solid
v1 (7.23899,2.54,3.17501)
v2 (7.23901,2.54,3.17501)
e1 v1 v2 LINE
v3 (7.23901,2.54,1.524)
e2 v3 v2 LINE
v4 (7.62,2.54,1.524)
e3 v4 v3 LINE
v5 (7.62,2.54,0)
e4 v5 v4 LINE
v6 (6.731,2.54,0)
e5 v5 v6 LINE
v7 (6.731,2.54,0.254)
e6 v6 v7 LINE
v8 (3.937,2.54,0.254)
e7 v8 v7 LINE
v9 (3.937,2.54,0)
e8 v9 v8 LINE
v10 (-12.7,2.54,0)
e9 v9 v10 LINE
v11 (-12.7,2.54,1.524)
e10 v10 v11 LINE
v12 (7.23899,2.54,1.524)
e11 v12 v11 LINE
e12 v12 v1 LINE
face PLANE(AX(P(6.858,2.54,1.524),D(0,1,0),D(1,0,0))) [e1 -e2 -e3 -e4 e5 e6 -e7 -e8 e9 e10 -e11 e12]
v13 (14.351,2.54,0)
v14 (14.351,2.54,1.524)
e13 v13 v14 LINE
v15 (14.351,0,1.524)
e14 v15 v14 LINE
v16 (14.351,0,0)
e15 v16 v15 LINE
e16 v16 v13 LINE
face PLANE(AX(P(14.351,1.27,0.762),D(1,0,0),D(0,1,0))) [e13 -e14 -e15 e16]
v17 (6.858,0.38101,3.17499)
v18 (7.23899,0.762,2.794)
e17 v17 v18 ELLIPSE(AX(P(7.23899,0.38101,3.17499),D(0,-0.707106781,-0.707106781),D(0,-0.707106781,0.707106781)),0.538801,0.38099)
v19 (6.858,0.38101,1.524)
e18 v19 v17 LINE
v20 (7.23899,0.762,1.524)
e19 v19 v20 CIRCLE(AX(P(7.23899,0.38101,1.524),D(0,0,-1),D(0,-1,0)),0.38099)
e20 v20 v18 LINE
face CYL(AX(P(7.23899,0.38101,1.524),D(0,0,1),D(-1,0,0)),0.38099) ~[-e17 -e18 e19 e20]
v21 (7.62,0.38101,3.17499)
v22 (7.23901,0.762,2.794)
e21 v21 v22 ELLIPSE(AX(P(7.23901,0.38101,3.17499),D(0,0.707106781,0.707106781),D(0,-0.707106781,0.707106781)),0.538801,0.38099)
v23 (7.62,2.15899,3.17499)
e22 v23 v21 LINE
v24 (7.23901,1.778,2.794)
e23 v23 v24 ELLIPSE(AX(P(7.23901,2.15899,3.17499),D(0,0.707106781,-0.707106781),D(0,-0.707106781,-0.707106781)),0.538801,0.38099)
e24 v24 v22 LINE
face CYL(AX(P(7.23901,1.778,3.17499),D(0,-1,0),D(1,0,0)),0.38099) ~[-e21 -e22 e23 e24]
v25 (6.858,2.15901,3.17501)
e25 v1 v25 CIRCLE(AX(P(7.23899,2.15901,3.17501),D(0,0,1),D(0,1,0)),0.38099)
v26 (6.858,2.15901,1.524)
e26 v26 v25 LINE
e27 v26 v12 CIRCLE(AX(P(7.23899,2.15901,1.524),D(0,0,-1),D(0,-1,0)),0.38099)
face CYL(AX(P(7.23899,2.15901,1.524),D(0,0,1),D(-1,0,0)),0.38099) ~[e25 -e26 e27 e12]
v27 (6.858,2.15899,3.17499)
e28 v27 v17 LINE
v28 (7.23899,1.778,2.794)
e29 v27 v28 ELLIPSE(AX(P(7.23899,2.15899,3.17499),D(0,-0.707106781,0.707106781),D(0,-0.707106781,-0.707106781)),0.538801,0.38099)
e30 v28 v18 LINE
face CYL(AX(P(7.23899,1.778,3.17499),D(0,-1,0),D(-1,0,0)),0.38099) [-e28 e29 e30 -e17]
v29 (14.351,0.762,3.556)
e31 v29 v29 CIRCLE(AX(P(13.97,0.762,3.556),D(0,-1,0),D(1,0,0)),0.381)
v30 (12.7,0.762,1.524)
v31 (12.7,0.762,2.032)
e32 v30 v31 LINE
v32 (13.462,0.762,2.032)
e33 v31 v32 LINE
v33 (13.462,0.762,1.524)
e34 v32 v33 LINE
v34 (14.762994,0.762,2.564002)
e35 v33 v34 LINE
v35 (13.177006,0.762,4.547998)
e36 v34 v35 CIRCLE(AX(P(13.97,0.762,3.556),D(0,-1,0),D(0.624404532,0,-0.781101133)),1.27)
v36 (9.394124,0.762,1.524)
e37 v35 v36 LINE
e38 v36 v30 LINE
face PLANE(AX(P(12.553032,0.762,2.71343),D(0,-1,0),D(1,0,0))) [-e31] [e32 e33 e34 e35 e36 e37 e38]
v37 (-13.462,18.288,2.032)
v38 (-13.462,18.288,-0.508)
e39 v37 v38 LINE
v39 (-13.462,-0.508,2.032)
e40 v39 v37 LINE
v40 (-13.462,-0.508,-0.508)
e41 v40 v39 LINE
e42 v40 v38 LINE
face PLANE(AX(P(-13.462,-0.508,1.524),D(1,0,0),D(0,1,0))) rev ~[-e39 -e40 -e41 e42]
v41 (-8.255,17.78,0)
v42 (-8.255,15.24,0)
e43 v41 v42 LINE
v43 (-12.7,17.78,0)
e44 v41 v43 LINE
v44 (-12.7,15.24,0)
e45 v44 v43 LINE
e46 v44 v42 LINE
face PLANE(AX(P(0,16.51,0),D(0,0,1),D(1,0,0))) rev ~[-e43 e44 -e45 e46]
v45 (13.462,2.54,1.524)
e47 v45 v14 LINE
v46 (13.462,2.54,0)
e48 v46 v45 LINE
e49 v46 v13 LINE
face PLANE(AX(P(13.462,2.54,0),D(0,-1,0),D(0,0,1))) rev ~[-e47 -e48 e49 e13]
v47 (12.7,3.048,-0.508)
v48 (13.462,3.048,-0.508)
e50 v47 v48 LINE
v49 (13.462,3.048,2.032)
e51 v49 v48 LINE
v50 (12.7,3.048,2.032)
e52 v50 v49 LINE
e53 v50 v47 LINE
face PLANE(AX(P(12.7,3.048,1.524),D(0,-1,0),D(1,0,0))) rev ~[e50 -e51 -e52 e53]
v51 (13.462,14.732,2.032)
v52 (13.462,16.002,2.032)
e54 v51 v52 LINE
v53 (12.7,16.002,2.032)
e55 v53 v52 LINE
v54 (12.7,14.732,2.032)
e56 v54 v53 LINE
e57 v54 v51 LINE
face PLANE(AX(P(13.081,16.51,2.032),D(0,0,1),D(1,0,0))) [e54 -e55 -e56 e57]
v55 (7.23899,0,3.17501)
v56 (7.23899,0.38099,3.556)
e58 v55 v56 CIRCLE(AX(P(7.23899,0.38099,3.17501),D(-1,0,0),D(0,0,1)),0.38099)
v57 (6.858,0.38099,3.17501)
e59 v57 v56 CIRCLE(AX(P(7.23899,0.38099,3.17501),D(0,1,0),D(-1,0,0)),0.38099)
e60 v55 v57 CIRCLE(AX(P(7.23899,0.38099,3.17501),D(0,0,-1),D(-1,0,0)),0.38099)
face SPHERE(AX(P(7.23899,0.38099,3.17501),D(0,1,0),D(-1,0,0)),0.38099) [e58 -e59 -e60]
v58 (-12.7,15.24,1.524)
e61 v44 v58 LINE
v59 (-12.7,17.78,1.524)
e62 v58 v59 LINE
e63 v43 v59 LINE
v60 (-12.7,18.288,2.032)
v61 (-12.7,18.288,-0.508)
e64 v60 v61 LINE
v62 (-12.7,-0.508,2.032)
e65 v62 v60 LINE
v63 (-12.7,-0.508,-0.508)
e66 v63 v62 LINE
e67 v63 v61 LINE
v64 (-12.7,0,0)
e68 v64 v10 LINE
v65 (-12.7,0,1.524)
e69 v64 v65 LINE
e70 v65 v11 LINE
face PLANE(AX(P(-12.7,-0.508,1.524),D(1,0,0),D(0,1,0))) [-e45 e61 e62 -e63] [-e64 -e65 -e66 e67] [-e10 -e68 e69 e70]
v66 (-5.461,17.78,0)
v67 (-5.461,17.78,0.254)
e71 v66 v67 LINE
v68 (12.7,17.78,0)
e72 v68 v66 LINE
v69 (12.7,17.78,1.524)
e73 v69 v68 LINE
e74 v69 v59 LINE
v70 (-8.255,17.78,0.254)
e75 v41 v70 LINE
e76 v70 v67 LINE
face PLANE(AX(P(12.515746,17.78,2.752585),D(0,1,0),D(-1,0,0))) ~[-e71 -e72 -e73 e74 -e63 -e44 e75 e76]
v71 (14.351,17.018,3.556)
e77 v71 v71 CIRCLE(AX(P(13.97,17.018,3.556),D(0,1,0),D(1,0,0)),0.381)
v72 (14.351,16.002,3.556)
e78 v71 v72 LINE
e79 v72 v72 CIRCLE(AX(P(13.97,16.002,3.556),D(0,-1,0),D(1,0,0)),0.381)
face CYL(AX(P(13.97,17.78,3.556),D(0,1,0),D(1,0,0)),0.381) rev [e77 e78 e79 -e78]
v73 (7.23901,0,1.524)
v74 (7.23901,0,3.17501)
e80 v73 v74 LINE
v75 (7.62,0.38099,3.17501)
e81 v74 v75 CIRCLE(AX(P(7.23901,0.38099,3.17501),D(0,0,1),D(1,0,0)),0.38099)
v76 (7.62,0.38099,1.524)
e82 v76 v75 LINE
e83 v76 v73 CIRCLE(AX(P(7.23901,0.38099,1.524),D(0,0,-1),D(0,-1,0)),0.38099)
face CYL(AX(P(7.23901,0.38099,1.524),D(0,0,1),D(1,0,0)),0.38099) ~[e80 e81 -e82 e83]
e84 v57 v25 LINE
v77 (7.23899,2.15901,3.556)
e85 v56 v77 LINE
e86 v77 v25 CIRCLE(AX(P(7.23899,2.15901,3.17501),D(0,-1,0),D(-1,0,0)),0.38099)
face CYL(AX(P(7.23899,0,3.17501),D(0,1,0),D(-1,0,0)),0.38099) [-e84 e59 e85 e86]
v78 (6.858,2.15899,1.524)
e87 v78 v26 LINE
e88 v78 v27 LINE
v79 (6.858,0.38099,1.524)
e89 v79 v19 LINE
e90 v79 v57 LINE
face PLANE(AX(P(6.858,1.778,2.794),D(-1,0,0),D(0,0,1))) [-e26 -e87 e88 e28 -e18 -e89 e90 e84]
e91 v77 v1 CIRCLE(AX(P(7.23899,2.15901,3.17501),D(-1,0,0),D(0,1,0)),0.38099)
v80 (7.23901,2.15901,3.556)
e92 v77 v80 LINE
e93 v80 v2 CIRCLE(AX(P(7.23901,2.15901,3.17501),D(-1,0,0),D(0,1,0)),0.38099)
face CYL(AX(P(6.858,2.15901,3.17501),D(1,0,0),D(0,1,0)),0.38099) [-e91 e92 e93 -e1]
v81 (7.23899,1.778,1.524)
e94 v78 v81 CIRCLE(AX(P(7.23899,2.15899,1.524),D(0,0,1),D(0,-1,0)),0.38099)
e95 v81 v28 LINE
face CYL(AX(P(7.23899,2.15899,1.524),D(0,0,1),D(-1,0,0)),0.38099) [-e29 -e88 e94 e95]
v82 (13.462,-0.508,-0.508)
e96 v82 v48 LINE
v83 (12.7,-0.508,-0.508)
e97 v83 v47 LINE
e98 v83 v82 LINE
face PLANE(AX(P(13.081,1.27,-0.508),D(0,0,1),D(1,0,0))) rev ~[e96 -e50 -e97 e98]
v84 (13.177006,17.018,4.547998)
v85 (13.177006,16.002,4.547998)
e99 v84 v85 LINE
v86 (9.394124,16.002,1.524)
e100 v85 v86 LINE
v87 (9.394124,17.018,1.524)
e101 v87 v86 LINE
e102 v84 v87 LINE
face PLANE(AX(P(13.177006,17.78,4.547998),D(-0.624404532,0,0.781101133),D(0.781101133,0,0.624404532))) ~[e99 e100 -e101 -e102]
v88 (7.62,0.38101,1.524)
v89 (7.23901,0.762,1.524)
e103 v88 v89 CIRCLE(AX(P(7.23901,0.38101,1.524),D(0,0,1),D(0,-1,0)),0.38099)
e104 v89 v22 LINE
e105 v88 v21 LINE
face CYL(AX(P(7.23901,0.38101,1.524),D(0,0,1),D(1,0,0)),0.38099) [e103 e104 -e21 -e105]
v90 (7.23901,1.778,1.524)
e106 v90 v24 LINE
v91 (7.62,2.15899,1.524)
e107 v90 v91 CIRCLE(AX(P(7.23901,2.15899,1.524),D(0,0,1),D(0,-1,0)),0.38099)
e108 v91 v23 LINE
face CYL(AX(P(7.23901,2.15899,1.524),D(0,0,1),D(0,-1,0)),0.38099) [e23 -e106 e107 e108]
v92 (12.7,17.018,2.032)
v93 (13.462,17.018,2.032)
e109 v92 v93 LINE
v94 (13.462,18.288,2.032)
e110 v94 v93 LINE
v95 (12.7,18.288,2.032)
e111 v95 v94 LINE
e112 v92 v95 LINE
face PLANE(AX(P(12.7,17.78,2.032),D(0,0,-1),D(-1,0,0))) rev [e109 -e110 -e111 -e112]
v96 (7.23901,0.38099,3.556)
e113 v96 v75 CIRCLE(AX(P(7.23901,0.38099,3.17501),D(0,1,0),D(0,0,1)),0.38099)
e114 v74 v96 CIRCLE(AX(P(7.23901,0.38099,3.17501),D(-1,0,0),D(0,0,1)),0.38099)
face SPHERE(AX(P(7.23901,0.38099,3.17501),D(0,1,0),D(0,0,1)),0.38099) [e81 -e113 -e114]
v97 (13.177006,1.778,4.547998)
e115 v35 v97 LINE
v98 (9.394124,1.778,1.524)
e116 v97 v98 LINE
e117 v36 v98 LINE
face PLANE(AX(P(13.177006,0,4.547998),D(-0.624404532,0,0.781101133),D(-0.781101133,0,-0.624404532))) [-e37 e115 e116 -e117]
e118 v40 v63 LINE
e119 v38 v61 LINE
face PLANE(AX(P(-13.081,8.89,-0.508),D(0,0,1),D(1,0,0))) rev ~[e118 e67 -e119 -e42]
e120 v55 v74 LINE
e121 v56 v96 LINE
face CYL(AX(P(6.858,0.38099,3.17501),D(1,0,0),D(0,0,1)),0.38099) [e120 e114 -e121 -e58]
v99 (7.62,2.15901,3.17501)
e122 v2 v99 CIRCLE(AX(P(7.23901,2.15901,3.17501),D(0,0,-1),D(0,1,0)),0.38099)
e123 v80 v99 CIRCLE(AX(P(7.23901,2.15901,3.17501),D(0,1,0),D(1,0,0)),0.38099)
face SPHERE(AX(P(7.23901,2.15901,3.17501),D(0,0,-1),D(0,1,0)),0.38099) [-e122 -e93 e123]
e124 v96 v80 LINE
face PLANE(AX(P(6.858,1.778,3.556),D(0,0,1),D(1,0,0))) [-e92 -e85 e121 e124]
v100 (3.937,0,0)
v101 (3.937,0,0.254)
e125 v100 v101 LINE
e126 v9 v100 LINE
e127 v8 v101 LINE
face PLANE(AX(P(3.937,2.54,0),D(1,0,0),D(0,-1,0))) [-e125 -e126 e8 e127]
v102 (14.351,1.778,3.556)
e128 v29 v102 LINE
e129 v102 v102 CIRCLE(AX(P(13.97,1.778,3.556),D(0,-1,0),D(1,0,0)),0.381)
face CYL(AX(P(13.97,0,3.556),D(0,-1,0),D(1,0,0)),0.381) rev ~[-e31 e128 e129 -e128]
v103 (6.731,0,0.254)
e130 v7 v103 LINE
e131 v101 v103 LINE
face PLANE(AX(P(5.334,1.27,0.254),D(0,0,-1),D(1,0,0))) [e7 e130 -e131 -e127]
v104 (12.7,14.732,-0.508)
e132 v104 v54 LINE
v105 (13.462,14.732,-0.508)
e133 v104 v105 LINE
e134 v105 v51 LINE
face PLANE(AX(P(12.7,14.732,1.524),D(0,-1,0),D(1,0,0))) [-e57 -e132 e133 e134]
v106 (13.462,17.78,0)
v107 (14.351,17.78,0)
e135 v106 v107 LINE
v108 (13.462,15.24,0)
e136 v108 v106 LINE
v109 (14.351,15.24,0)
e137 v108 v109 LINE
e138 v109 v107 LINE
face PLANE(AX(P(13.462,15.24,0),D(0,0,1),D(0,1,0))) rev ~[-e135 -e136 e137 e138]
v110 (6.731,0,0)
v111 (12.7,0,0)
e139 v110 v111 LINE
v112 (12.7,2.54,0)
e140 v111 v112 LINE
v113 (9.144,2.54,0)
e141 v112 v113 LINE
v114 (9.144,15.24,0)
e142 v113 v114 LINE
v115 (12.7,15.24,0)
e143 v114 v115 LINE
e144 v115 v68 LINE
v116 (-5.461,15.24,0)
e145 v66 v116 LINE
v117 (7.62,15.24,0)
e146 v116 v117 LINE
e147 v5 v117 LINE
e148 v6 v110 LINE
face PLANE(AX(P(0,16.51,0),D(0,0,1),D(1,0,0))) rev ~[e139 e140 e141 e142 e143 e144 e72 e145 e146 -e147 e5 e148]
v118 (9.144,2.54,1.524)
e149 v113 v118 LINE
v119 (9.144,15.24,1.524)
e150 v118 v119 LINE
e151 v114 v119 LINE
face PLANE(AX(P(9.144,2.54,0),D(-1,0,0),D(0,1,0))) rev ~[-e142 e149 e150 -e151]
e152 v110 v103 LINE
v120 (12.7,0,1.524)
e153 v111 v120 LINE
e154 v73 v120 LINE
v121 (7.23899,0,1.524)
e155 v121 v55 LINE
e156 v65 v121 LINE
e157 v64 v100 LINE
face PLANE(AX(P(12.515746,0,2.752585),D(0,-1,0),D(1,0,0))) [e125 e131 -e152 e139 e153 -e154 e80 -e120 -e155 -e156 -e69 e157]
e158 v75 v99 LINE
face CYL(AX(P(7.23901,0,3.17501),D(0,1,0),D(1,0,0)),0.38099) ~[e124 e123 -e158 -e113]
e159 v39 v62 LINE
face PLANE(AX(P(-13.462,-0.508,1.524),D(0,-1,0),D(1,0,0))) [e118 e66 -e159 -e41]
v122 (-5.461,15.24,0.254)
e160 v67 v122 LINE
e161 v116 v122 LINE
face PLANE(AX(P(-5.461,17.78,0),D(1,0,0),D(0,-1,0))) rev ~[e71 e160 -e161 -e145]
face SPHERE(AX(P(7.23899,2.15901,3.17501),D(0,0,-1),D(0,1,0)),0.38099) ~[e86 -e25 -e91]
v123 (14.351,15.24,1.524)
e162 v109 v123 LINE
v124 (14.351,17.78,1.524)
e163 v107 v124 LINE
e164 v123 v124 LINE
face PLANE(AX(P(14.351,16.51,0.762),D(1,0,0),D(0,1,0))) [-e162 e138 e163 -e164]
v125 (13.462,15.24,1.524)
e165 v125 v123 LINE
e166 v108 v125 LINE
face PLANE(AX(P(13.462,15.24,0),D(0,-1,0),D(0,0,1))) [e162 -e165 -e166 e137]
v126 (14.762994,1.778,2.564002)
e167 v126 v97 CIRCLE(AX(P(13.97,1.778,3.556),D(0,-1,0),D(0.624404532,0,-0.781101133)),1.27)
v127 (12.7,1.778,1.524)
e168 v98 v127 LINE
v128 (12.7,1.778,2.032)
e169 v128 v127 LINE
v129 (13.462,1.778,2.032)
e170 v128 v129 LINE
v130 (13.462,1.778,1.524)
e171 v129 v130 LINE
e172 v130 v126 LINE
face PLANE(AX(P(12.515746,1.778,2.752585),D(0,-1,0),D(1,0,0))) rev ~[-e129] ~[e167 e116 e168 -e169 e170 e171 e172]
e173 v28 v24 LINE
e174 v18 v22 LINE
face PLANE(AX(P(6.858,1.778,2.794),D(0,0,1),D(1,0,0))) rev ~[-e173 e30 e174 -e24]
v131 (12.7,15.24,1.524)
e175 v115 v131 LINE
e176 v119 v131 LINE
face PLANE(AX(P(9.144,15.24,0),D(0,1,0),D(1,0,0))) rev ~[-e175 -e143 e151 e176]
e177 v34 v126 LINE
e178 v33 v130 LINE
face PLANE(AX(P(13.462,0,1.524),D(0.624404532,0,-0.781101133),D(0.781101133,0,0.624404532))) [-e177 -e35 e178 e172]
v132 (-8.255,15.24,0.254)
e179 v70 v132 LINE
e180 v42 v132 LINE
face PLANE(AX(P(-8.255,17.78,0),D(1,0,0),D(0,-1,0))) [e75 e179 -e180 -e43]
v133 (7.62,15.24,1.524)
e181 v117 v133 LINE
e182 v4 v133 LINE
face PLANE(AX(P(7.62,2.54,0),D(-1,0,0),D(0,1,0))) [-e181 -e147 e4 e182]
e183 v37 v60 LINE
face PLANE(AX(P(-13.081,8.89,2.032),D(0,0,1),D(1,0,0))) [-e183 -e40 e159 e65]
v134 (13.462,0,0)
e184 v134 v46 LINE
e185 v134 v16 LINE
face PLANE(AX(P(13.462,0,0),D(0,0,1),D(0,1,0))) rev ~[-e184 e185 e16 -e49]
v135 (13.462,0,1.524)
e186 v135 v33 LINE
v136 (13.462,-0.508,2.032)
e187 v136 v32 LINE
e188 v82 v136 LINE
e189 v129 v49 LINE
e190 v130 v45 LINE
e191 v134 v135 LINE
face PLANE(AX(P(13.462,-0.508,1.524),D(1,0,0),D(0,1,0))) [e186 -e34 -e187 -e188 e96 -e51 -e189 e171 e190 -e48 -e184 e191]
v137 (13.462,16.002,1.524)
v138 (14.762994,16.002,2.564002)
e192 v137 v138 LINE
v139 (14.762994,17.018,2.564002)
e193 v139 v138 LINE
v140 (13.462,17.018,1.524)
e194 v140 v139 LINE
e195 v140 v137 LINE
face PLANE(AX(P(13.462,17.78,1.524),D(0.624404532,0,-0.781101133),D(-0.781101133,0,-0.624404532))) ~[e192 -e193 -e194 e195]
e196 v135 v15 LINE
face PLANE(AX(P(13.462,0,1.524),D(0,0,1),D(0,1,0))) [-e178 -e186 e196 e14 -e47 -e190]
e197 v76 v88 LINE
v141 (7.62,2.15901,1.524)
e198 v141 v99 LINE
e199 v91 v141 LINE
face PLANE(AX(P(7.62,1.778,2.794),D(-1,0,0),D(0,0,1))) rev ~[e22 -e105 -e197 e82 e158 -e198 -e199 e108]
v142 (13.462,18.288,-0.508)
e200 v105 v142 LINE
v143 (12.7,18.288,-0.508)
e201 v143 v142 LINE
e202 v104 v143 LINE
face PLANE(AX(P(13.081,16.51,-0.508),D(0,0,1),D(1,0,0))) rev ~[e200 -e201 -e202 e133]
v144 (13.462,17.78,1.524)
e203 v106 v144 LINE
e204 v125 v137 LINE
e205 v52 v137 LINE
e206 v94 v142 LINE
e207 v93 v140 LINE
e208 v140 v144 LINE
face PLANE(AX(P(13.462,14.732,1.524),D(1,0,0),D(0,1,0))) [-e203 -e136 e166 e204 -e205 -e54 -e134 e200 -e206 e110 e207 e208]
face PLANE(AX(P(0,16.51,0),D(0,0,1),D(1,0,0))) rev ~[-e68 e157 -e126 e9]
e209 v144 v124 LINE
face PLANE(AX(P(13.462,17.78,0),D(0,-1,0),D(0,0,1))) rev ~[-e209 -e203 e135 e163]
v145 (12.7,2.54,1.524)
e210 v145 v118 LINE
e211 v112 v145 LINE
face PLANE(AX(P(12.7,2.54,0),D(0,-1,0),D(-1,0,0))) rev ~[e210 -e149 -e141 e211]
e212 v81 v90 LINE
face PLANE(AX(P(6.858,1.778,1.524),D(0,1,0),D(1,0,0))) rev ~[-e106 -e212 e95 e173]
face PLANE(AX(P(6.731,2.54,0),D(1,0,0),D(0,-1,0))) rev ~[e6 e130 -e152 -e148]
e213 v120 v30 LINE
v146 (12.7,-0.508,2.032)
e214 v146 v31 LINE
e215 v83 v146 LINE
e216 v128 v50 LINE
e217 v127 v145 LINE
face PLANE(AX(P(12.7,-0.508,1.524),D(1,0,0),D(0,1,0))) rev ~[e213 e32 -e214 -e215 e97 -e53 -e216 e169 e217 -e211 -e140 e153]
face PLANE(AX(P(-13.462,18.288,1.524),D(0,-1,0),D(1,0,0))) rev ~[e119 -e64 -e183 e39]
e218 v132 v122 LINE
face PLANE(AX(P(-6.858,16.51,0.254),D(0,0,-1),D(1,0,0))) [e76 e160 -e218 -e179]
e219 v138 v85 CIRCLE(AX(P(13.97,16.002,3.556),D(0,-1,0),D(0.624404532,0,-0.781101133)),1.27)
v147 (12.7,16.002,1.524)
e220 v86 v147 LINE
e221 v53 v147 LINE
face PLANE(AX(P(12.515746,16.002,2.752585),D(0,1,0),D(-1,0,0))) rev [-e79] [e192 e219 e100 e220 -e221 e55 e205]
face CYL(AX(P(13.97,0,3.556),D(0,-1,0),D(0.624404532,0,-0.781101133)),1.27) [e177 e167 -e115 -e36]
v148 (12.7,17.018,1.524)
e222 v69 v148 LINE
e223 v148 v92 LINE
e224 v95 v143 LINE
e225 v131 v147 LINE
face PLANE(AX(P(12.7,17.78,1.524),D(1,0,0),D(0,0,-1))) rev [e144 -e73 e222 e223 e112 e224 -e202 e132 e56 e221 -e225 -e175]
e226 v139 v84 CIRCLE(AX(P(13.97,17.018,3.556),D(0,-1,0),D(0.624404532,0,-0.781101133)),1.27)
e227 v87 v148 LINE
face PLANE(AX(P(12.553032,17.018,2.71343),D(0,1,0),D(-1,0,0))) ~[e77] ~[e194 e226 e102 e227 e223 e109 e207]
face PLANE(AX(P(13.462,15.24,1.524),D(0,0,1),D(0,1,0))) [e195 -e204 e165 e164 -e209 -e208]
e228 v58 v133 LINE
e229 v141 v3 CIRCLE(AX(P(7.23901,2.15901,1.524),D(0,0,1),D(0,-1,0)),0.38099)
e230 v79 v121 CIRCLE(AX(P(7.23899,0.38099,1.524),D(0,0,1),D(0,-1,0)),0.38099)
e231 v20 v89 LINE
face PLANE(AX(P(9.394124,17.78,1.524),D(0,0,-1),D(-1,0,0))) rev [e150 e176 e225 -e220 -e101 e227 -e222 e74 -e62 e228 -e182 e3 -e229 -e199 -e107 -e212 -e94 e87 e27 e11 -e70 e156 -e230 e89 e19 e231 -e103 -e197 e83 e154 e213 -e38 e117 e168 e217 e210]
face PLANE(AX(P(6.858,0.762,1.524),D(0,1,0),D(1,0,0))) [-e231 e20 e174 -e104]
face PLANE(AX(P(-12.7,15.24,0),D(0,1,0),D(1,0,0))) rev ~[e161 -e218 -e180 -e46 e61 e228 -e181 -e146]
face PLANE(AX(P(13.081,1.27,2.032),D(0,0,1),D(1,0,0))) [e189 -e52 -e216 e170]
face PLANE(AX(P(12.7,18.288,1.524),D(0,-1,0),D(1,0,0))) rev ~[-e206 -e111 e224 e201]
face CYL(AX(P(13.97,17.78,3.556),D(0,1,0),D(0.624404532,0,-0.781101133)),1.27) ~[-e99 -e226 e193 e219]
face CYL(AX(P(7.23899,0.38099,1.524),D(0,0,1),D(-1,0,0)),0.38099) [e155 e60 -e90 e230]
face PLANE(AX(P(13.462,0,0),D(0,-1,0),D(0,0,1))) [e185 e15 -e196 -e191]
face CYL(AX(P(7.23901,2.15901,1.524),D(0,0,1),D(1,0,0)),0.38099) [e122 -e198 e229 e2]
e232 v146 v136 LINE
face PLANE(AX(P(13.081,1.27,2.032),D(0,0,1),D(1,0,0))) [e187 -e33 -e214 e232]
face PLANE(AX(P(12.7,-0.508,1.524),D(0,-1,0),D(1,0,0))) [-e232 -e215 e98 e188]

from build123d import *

# Parameters (mm, degrees)
F0_W          = 1.524
F0_H          = 12.7
F1_DEPTH      = 1.524
F2_W          = 0.762
F2_H          = 18.796
F2_H_2        = 3.556
F3_DEPTH      = 0.508
F3_DEPTH_BACK = 2.032
F4_R          = 0.381
F5_DEPTH      = 1.778
F7_DEPTH      = 0.762
F9_W          = 2.794
F9_H          = 2.54
F10_DEPTH     = 0.254
F11_W         = 2.54
F11_H         = 1.524
F12_DEPTH     = 0.889
F13_W         = 2.54
F13_H         = 1.524
F14_DEPTH     = 0.889
F15_W         = 0.762
F15_H         = 0.762
F16_DEPTH     = 2.032
F17_W         = 0.762
F17_H         = 0.762
F18_DEPTH     = 1.016
F19_R         = 0.38099


# Not quite as in the source:
# - a fillet or chamfer is up to 0.001 mm smaller than in the source, because OpenCascade refuses the exact size
# - a pattern or mirror of a feature is missing from the dataset's text; its kind, count and spacing are read off the source's solid


with BuildPart() as f1:
    # F0 (on Top) → F1 (new body)
    with BuildSketch(Plane.XY):
        Polygon((-12.7, 17.78), (-12.7, 15.24), (7.62, 15.24), (9.144, 15.24), (12.7, 15.24), (12.7, 17.78), align=None)
        Polygon((-12.7, 0), (-12.7, 2.54), (-12.7, 15.24), (-12.7, 17.78), (-12.7, 18.288), (-13.462, 18.288), (-13.462, -0.508), (-12.7, -0.508), align=None)
        Polygon((7.62, 2.54), (-12.7, 2.54), (-12.7, 0), (12.7, 0), (12.7, 2.54), (9.144, 2.54), align=None)
        with Locations((8.382, 8.89)):
            Rectangle(F0_W, F0_H)
        Polygon((12.7, 2.54), (12.7, 0), (12.7, -0.508), (13.462, -0.508), (13.462, 3.048), (12.7, 3.048), align=None)
        Polygon((12.7, 18.288), (12.7, 17.78), (12.7, 15.24), (12.7, 14.732), (13.462, 14.732), (13.462, 18.288), align=None)
    extrude(amount=F1_DEPTH)

    # F2 (on face) → F3 (join, two sides)
    with BuildSketch(Plane.XY.offset(1.524)) as f3_sk:
        with Locations((-13.081, 8.89)):
            Rectangle(F2_W, F2_H)
        with Locations((13.081, 16.51)):
            Rectangle(F2_W, F2_H_2)
        with Locations((13.081, 1.27)):
            Rectangle(F2_W, F2_H_2)
    extrude(amount=F3_DEPTH)
    extrude(f3_sk.sketch, amount=-F3_DEPTH_BACK)

    # F4 (on face) → F5 (join)
    with BuildSketch(Plane.XZ):
        with BuildLine():
            Line((13.462, 1.524), (14.762993756, 2.564001561))
            ThreePointArc((14.762993756, 2.564001561), (14.961998439, 4.348993756), (13.177006244, 4.547998439))
            Line((13.177006244, 4.547998439), (9.3941243381, 1.524))
            Line((9.3941243381, 1.524), (13.462, 1.524))
        make_face()
        with Locations((13.97, 3.556)):
            Circle(F4_R, mode=Mode.SUBTRACT)
    f5 = extrude(amount=-F5_DEPTH)

    # F5_copies: F5 across plane
    add(f5.mirror(Plane.ZX.offset(8.89)))

    # F6 (on face) → F7 (cut)
    with BuildSketch(Plane.XZ):
        with BuildLine():
            Line((13.177006244, 4.547998439), (9.3941243381, 1.524))
            Line((9.3941243381, 1.524), (12.7, 1.524))
            Line((12.7, 1.524), (12.7, 2.032))
            Line((12.7, 2.032), (13.462, 2.032))
            Line((13.462, 2.032), (13.462, 1.524))
            Line((13.462, 1.524), (14.762993756, 2.564001561))
            ThreePointArc((14.762993756, 2.564001561), (14.961998439, 4.348993756), (13.177006244, 4.547998439))
        make_face()
    f7 = extrude(amount=-F7_DEPTH, mode=Mode.SUBTRACT)

    # F7_copies: F7 across plane
    add(f7.mirror(Plane.ZX.offset(8.89)), mode=Mode.SUBTRACT)

    # F9 (on face) → F10 (cut)
    with BuildSketch(Plane(origin=(0, 0, 0), x_dir=(1, 0, 0), z_dir=(0, 0, -1))):
        with Locations((5.334, -1.27)):
            Rectangle(F9_W, F9_H)
        with Locations((-6.858, -16.51)):
            Rectangle(F9_W, F9_H)
    extrude(amount=-F10_DEPTH, mode=Mode.SUBTRACT)

    # F11 (on face) → F12 (join)
    with BuildSketch(Plane.YZ.offset(13.462)):
        with Locations((1.27, 0.762)):
            Rectangle(F11_W, F11_H)
    extrude(amount=F12_DEPTH)

    # F13 (on face) → F14 (join)
    with BuildSketch(Plane.YZ.offset(13.462)):
        with Locations((16.51, 0.762)):
            Rectangle(F13_W, F13_H)
    extrude(amount=F14_DEPTH)

    # F15 (on face) → F16 (join)
    with BuildSketch(Plane.XY.offset(1.524)):
        with Locations((7.239, 2.159)):
            Rectangle(F15_W, F15_H)
        with Locations((7.239, 0.381)):
            Rectangle(F15_W, F15_H)
    extrude(amount=F16_DEPTH)

    # F17 (on face) → F18 (join, through all)
    with BuildSketch(Plane.XZ.offset(-1.778)):
        with Locations((7.239, 3.175)):
            Rectangle(F17_W, F17_H)
    extrude(amount=F18_DEPTH)

    # F19 (radius 0.381 in the source; OpenCascade refuses exactly that, so slightly less here)
    f19_edges = [f1.edges().sort_by_distance(p)[0] for p in [
        (6.858, 2.54, 2.54),
        (7.62, 2.54, 2.54),
        (7.239, 2.54, 3.556),
        (7.62, 1.27, 3.556),
        (6.858, 1.27, 3.556),
        (6.858, 1.27, 2.794),
        (6.858, 1.778, 2.159),
        (6.858, 0.762, 2.159),
        (7.62, 0.762, 2.159),
        (6.858, 0, 2.54),
        (7.239, 0, 3.556),
        (7.62, 1.27, 2.794),
        (7.62, 0, 2.54),
        (7.62, 1.778, 2.159),
    ]]
    fillet(f19_edges, radius=F19_R)


solid = f1.part
